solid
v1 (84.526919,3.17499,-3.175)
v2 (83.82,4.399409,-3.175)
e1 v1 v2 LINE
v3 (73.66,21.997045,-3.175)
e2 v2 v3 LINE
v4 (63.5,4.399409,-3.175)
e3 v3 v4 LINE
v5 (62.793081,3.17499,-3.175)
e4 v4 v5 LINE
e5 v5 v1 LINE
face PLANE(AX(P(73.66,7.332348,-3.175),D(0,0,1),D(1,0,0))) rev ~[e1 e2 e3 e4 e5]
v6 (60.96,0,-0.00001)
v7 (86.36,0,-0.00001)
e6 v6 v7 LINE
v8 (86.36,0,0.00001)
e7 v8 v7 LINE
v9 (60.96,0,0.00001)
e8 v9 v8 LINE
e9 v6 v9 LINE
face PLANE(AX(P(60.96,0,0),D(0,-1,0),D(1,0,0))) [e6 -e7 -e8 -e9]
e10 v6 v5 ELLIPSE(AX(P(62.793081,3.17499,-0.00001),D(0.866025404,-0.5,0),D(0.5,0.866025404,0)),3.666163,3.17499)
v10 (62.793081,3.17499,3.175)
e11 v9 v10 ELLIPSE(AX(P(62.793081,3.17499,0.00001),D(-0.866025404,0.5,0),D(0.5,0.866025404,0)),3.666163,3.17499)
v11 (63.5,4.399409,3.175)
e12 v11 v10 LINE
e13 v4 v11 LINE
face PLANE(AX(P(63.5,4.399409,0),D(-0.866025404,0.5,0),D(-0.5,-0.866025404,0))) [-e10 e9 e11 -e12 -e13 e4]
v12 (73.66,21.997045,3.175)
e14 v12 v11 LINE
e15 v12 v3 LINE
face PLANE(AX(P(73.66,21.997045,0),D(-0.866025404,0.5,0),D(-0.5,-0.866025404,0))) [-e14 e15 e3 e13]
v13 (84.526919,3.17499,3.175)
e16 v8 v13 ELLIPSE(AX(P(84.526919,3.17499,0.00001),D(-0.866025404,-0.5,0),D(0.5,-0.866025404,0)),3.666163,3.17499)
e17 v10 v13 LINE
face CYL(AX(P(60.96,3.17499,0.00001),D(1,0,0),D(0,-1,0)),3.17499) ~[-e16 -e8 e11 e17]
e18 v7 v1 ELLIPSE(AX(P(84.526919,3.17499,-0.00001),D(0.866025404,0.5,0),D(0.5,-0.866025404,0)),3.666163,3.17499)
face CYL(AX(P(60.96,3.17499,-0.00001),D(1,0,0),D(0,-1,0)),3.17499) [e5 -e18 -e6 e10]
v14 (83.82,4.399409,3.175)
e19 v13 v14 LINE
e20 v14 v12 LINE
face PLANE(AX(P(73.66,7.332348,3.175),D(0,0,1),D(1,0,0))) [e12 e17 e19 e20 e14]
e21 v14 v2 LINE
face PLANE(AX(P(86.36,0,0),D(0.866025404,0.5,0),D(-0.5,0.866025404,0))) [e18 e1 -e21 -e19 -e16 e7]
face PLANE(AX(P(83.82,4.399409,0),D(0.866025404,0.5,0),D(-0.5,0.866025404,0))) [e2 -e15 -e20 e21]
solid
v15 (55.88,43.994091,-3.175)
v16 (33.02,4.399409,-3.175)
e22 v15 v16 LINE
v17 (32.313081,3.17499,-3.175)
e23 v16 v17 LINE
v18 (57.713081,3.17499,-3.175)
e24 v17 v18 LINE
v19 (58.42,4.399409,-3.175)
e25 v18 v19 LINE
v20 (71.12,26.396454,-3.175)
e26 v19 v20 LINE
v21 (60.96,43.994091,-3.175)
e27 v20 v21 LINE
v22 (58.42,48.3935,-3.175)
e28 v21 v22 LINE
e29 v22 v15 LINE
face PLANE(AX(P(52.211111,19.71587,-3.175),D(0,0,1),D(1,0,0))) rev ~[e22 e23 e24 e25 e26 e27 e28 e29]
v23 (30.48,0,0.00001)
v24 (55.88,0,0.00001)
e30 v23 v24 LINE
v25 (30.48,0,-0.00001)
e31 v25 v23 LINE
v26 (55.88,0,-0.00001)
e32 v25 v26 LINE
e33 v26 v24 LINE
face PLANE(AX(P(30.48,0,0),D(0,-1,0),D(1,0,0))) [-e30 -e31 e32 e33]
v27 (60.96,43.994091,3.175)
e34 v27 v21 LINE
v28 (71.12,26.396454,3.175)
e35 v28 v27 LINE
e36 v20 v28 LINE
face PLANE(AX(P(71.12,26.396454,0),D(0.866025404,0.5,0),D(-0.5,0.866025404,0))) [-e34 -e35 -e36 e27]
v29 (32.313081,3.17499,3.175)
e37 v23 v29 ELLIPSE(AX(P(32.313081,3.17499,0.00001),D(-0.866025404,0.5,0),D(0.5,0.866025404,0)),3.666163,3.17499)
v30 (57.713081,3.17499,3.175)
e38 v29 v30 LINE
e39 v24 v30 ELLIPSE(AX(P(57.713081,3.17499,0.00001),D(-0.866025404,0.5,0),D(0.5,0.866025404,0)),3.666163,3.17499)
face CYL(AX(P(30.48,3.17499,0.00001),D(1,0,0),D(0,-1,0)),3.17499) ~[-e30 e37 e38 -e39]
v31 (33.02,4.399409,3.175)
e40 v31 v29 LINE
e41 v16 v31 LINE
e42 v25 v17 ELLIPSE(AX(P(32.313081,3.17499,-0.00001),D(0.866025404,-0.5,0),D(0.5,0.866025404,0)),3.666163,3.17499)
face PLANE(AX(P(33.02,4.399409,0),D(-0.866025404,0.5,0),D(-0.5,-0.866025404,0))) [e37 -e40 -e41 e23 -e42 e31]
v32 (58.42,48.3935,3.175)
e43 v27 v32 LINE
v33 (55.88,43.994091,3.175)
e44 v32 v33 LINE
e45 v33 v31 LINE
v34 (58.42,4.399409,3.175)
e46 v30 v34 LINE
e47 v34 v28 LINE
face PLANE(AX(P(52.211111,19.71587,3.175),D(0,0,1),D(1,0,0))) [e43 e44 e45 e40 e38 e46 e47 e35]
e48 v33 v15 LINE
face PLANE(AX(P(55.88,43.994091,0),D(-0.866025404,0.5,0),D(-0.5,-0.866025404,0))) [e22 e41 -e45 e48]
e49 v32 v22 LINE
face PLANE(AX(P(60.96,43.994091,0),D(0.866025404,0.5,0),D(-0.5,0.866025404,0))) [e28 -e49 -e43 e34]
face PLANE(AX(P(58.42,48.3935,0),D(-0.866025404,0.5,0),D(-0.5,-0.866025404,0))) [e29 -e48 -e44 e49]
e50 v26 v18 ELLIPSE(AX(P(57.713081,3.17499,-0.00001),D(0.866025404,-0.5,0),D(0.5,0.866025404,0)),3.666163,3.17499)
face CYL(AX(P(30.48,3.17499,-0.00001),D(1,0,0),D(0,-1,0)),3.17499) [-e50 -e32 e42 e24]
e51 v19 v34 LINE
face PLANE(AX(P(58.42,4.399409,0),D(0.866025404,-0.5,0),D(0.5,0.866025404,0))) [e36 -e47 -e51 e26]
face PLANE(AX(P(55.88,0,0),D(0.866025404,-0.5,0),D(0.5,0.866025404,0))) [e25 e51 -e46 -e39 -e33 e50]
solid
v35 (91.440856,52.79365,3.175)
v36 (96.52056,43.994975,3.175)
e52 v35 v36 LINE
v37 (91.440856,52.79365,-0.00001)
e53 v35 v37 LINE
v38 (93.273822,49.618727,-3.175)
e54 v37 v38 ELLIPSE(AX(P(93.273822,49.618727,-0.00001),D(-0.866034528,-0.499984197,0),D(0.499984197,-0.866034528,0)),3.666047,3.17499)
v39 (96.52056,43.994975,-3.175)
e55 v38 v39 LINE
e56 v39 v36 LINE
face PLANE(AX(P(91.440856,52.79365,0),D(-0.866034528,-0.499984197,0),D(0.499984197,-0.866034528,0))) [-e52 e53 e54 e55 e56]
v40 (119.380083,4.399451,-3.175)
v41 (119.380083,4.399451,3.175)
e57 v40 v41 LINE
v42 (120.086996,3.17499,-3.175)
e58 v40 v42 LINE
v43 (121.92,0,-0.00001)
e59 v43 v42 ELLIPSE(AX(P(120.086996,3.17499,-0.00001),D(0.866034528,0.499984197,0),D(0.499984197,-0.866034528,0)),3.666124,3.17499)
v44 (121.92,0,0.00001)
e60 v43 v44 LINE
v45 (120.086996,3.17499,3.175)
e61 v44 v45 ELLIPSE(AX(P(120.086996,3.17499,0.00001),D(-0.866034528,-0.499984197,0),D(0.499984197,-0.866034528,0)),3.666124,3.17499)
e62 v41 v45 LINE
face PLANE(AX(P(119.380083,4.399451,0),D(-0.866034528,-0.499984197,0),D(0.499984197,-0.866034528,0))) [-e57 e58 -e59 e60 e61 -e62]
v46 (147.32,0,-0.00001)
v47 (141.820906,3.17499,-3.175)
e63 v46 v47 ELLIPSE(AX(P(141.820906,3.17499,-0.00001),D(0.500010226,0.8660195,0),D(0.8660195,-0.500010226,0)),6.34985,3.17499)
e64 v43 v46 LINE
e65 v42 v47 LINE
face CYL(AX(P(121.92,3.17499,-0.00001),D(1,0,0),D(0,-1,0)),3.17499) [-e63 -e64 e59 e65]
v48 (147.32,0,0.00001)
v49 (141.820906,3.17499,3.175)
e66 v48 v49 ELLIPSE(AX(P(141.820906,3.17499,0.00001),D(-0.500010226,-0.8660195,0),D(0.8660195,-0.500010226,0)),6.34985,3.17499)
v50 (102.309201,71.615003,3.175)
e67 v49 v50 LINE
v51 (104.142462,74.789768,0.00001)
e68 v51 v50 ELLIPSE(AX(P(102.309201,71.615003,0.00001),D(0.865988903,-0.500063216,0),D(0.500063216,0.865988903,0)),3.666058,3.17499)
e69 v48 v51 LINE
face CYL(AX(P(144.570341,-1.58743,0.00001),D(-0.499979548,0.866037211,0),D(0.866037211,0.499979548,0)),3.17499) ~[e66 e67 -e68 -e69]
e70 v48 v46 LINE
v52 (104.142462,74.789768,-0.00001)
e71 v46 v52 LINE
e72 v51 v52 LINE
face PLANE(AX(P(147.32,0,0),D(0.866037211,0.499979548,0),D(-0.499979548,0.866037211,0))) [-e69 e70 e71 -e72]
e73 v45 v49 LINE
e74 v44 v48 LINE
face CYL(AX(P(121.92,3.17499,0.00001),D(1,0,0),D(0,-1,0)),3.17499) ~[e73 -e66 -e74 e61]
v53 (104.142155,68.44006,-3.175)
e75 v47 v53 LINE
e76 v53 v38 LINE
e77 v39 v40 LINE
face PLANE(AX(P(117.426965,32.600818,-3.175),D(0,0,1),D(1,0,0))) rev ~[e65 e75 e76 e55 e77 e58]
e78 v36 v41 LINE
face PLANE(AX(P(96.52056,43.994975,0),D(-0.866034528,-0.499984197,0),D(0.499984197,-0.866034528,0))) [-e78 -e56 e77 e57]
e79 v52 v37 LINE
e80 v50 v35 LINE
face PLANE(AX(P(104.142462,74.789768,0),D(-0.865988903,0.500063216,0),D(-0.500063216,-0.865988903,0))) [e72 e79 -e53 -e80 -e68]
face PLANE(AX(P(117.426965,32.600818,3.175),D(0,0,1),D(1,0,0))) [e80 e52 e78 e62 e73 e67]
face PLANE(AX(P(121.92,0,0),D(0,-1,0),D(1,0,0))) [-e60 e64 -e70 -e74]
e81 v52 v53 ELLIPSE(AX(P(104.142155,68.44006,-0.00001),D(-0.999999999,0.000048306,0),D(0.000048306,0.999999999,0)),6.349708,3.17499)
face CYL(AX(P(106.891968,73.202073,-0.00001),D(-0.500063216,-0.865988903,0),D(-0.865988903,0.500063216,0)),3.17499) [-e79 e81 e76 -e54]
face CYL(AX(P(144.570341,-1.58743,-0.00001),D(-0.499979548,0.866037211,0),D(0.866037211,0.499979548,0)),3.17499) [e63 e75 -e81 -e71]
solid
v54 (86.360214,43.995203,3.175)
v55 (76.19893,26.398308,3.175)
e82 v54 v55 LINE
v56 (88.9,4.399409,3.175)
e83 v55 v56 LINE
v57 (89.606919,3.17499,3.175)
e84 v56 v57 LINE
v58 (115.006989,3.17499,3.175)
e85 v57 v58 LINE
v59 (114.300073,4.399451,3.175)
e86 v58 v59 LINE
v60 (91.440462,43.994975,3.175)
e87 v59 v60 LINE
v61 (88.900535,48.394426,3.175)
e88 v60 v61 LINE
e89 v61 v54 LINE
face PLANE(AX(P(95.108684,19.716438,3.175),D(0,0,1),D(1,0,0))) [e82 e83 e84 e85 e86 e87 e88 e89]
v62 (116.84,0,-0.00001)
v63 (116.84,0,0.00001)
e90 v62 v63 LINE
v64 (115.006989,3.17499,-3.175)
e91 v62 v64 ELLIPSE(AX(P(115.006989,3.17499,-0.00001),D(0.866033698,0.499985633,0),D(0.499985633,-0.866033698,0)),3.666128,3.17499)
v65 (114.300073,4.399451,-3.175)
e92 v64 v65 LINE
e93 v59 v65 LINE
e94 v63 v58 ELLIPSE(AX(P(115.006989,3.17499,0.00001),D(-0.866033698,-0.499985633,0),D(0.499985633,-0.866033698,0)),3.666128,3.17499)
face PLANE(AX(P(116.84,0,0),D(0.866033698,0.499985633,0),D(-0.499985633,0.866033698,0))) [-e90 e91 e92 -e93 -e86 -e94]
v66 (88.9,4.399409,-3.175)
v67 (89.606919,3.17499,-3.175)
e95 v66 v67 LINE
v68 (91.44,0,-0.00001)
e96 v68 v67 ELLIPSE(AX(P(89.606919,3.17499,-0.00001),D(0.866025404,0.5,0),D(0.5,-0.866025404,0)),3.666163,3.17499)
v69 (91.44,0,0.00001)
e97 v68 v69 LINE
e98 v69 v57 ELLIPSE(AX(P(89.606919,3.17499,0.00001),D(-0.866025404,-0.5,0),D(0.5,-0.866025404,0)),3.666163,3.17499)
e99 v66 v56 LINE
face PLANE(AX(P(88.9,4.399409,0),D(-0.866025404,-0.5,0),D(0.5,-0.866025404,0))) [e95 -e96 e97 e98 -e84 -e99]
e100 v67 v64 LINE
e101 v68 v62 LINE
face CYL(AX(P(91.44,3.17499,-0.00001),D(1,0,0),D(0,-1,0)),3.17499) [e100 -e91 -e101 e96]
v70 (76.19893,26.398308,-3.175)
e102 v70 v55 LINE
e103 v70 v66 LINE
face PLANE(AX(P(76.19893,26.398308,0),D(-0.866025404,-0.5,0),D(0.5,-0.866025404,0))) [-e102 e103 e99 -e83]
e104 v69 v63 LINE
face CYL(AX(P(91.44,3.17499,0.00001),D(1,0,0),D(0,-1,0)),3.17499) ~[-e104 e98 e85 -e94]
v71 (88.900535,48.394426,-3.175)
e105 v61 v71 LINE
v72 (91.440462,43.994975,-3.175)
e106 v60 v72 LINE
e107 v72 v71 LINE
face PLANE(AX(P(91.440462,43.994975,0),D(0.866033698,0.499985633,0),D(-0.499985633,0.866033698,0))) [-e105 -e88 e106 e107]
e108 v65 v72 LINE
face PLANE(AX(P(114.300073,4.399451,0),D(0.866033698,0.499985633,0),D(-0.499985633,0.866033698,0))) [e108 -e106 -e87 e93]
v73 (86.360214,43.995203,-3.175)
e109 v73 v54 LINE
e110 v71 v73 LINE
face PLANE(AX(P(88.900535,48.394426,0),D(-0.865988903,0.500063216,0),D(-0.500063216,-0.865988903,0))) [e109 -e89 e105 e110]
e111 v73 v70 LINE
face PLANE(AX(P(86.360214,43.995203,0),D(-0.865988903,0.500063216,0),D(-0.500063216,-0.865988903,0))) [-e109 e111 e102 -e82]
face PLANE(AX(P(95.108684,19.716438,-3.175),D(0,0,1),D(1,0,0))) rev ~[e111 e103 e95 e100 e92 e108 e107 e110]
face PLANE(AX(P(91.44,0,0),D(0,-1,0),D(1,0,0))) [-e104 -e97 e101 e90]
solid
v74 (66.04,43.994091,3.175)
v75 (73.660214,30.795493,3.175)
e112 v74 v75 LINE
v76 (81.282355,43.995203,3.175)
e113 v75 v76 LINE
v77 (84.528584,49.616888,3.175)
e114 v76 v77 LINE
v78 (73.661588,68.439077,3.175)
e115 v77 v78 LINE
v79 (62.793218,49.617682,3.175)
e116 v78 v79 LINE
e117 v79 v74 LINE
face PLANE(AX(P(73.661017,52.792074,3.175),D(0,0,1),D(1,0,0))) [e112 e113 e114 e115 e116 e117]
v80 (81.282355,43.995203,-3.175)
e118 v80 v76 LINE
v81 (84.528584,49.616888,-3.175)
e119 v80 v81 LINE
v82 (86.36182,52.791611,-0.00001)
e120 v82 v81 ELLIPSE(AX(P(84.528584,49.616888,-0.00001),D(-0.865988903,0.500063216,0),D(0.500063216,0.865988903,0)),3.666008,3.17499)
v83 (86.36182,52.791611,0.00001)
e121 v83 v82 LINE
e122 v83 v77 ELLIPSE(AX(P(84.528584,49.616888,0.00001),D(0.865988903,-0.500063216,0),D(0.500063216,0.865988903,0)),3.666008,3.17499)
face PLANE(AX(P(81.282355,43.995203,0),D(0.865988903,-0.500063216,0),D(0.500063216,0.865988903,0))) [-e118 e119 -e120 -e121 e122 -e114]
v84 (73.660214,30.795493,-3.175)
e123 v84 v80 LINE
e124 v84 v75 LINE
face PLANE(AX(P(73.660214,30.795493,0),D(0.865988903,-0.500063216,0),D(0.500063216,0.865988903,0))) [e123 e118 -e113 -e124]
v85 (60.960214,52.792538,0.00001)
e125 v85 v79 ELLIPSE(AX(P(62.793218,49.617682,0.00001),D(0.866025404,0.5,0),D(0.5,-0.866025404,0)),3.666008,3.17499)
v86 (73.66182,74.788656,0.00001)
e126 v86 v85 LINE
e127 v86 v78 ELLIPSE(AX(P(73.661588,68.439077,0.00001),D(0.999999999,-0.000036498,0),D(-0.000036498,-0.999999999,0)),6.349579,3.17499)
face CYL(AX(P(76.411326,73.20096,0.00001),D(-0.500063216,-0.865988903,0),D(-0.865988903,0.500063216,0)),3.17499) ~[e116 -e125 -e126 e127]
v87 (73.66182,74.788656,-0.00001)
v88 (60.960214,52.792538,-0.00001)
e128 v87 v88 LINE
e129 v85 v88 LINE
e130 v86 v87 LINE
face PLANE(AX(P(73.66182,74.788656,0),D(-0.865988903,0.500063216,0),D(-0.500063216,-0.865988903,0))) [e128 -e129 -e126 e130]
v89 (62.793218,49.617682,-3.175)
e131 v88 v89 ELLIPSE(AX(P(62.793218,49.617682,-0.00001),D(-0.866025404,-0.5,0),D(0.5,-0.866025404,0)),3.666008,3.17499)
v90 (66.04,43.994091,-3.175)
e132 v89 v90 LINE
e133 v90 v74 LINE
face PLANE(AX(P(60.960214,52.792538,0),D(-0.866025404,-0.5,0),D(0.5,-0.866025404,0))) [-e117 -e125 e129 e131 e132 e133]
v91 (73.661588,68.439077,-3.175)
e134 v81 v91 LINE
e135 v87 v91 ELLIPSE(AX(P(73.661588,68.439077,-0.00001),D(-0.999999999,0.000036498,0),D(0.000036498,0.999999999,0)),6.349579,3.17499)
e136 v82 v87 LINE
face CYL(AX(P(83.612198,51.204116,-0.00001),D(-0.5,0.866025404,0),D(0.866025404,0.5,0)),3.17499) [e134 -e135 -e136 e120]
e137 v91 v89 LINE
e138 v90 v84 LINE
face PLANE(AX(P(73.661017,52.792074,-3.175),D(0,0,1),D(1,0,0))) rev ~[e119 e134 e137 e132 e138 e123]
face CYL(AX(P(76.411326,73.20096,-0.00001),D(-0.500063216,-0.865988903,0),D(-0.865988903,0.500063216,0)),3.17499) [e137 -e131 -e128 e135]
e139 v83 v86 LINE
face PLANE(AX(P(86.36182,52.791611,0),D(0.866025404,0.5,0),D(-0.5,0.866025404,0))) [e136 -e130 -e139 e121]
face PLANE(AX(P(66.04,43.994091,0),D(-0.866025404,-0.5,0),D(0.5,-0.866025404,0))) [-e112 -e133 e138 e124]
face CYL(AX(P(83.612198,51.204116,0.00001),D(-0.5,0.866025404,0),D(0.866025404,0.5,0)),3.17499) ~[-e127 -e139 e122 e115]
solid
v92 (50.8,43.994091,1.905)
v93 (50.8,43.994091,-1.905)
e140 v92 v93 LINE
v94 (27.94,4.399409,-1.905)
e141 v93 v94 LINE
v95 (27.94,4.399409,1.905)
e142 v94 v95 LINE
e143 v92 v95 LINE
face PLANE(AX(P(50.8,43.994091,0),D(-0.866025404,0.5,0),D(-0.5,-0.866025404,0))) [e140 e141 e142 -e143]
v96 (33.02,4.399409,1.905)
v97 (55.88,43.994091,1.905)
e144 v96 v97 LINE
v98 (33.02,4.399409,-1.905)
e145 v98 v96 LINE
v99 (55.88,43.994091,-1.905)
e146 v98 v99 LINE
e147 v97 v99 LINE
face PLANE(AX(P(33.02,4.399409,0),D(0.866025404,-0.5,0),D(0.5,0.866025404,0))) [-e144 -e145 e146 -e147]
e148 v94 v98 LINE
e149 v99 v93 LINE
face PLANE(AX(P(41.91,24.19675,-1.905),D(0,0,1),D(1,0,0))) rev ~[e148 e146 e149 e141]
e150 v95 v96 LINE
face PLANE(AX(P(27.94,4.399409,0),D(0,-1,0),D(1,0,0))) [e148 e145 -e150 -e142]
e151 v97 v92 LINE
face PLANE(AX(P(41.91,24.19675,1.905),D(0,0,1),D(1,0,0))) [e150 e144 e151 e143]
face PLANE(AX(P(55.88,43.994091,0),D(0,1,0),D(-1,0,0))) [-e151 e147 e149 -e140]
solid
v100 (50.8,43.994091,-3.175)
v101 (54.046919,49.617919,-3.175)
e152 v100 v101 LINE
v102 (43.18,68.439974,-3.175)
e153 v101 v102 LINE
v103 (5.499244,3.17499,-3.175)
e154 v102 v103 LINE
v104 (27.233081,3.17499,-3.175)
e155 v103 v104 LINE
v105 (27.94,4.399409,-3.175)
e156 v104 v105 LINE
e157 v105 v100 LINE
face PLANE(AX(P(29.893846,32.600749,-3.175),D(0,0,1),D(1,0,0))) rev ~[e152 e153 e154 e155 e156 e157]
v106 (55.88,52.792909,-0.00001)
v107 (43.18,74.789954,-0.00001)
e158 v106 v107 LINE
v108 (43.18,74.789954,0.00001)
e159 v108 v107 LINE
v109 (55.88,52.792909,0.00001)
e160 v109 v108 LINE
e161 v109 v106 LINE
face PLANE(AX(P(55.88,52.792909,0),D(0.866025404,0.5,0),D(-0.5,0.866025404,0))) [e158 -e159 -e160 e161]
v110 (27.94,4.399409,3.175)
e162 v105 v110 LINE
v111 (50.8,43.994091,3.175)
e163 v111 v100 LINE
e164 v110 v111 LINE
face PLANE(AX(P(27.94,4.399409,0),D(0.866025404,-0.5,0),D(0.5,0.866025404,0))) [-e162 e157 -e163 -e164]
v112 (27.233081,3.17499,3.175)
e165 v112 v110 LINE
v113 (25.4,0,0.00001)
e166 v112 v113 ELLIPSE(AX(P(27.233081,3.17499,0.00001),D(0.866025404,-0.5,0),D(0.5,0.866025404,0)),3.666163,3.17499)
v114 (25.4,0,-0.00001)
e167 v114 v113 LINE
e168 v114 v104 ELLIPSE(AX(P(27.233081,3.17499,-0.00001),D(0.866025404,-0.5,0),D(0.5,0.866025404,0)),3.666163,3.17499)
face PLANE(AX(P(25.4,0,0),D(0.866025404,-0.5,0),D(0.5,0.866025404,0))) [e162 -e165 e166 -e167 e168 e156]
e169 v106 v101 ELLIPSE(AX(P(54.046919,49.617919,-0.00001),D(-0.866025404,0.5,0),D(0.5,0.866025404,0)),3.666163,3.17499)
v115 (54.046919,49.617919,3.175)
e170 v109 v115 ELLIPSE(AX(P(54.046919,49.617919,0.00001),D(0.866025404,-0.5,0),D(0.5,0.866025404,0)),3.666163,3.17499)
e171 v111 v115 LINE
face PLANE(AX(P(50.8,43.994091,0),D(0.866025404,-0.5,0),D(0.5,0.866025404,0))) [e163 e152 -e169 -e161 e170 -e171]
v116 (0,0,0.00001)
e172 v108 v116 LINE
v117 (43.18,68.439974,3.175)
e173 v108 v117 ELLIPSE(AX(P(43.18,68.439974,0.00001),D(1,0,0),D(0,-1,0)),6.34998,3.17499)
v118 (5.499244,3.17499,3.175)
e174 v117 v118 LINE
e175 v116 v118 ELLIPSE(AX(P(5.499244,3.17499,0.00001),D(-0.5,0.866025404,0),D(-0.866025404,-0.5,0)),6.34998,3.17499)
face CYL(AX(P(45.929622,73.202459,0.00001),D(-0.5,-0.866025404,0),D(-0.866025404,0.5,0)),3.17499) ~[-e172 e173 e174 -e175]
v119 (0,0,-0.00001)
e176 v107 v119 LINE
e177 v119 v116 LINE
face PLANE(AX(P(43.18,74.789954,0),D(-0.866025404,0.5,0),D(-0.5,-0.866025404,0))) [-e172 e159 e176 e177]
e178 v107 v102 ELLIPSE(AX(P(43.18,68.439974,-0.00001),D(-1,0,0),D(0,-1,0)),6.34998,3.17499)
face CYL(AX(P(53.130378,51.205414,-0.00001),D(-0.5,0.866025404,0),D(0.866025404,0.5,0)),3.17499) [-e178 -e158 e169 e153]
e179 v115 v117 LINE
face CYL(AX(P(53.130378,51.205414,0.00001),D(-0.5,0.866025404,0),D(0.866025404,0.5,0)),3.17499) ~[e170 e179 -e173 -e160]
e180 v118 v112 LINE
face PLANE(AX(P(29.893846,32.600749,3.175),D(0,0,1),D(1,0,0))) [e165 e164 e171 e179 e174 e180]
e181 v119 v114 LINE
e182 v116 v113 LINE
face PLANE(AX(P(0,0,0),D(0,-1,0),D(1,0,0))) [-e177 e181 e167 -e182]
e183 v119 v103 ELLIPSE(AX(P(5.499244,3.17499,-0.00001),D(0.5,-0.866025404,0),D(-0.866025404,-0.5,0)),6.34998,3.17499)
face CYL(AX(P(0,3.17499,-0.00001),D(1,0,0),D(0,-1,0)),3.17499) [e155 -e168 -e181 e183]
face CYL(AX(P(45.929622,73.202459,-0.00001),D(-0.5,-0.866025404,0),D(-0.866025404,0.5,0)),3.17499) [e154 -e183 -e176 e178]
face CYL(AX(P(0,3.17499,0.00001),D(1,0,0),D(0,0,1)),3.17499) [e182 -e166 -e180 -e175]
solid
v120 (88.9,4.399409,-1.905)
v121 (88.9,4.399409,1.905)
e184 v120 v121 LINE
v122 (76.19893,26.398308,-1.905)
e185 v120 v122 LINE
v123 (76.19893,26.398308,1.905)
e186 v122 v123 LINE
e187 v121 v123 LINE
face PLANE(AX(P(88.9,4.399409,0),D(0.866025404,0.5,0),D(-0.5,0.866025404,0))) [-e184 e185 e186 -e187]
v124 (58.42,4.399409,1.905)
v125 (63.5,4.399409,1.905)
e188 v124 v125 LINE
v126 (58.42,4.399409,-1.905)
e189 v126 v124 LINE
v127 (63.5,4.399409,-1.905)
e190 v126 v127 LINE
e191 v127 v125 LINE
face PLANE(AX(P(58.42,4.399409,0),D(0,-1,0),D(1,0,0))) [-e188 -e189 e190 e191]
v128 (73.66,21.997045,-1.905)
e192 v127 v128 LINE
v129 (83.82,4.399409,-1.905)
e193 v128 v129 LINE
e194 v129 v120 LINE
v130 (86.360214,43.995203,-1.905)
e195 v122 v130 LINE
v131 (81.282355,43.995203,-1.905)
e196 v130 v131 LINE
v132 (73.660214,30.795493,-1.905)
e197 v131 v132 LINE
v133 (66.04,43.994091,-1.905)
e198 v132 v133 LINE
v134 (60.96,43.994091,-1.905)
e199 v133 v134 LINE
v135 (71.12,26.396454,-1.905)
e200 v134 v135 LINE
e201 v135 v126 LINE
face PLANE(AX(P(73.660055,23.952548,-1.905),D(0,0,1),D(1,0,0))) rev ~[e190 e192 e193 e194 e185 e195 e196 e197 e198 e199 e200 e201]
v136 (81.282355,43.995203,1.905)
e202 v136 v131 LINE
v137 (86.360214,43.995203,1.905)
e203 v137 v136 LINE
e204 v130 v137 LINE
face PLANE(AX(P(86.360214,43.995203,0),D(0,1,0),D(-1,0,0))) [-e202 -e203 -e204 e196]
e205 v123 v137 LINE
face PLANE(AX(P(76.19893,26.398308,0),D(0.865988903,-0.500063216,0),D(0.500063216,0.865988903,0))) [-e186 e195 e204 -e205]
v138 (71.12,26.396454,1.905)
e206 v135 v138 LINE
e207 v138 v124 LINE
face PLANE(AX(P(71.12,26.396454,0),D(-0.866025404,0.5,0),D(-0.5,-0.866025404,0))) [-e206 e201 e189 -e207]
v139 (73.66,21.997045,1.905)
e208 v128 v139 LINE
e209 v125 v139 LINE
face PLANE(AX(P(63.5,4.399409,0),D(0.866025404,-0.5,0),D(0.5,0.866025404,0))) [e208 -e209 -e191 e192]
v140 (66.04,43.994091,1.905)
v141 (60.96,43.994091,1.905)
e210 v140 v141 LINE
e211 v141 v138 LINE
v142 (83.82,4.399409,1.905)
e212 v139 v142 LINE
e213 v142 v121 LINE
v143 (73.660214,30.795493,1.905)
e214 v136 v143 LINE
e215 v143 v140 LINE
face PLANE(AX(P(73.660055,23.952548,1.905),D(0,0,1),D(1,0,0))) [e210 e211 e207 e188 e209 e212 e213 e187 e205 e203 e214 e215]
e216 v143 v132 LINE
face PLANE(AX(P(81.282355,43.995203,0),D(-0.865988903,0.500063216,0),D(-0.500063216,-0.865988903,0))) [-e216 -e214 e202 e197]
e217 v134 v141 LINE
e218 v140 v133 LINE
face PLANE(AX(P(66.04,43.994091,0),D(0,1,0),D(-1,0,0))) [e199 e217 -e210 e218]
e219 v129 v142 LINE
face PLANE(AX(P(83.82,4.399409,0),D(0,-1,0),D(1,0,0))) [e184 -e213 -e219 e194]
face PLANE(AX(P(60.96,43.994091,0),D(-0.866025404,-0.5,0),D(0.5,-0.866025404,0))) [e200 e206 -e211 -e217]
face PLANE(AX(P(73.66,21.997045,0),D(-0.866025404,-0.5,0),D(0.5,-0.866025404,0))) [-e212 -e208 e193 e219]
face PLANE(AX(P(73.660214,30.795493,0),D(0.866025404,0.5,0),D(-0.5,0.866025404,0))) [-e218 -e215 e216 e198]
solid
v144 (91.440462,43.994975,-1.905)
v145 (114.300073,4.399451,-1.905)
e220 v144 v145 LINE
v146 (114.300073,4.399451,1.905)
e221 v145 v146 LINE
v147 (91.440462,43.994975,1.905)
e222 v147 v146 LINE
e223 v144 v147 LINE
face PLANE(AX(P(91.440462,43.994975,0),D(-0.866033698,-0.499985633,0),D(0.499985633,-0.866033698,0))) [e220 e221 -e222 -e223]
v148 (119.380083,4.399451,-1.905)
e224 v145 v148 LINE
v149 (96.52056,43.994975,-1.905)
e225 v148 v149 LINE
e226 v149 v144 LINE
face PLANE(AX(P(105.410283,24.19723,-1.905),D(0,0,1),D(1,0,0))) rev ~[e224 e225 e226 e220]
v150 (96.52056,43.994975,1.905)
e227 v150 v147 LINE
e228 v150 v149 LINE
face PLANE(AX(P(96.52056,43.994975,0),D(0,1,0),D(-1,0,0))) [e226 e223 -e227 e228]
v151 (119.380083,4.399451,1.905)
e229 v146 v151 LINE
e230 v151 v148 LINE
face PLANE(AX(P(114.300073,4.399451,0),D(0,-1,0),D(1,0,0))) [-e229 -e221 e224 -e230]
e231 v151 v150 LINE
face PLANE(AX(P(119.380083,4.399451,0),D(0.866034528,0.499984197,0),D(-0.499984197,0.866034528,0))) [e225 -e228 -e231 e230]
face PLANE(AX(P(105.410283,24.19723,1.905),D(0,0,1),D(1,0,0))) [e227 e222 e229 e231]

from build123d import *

# Parameters (mm, degrees)
F1_DEPTH = 3.175
F2_DEPTH = 1.905
F3_R     = 3.17499
F3_2_R   = 3.17499
F3_3_R   = 3.17499
F3_4_R   = 3.17499
F3_5_R   = 3.17499
F3_6_R   = 3.17499


# Not quite as in the source:
# - a fillet or chamfer is up to 0.001 mm smaller than in the source, because OpenCascade refuses the exact size


with BuildPart() as f1:
    # F0 (on Top) → F1 (new body, symmetric)
    with BuildSketch(Plane.XY):
        Polygon((43.18, 74.7899538708), (0, 0), (25.4, 0), (27.94, 4.3994090512), (50.8, 43.9940905122), (55.88, 52.7929086147), align=None)
    extrude(amount=F1_DEPTH, both=True)

    # F3 (radius 3.175 in the source; OpenCascade refuses exactly that, so slightly less here)
    f3_edges = [f1.edges().sort_by_distance(p)[0] for p in [
        (21.59, 37.394977, 3.175),
        (21.59, 37.394977, -3.175),
        (12.7, 0, -3.175),
        (12.7, 0, 3.175),
        (49.53, 63.791431, 3.175),
        (49.53, 63.791431, -3.175),
    ]]
    fillet(f3_edges, radius=F3_R)


with BuildPart() as f1b:
    # F0 (on Top) → F1, piece 2 (new body, symmetric)
    with BuildSketch(Plane.XY):
        Polygon((55.88, 43.9940905122), (33.02, 4.3994090512), (30.48, 0), (55.88, 0), (58.42, 4.3994090512), (71.12, 26.3964543073), (60.96, 43.9940905122), (58.42, 48.3934995635), align=None)
    extrude(amount=F1_DEPTH, both=True)

    # F3#3 (radius 3.175 in the source; OpenCascade refuses exactly that, so slightly less here)
    f3_3_edges = [f1b.edges().sort_by_distance(p)[0] for p in [
        (43.18, 0, -3.175),
        (43.18, 0, 3.175),
    ]]
    fillet(f3_3_edges, radius=F3_3_R)


with BuildPart() as f1c:
    # F0 (on Top) → F1, piece 3 (new body, symmetric)
    with BuildSketch(Plane.XY):
        Polygon((60.9602140859, 52.792537807), (66.04, 43.9940905122), (73.6602140859, 30.7954925508), (81.2823551529, 43.9952028573), (86.3618197643, 52.79161069), (73.6618197643, 74.7886559461), align=None)
    extrude(amount=F1_DEPTH, both=True)

    # F3#2 (radius 3.175 in the source; OpenCascade refuses exactly that, so slightly less here)
    f3_2_edges = [f1c.edges().sort_by_distance(p)[0] for p in [
        (67.311017, 63.790597, 3.175),
        (80.01182, 63.790133, 3.175),
        (80.01182, 63.790133, -3.175),
        (67.311017, 63.790597, -3.175),
    ]]
    fillet(f3_2_edges, radius=F3_2_R)


with BuildPart() as f1d:
    # F0 (on Top) → F1, piece 4 (new body, symmetric)
    with BuildSketch(Plane.XY):
        Polygon((88.9005352487, 48.3944264851), (86.360214113, 43.9952028573), (76.1989295703, 26.398308346), (88.9, 4.3994090512), (91.44, 0), (116.84, 0), (114.300072982, 4.3994511866), (91.4404622667, 43.9949752986), align=None)
    extrude(amount=F1_DEPTH, both=True)

    # F3#5 (radius 3.175 in the source; OpenCascade refuses exactly that, so slightly less here)
    f3_5_edges = [f1d.edges().sort_by_distance(p)[0] for p in [
        (104.14, 0, -3.175),
        (104.14, 0, 3.175),
    ]]
    fillet(f3_5_edges, radius=F3_5_R)


with BuildPart() as f1e:
    # F0 (on Top) → F1, piece 5 (new body, symmetric)
    with BuildSketch(Plane.XY):
        Polygon((73.66, 21.9970452561), (63.5, 4.3994090512), (60.96, 0), (86.36, 0), (83.82, 4.3994090512), align=None)
    extrude(amount=F1_DEPTH, both=True)

    # F3#4 (radius 3.175 in the source; OpenCascade refuses exactly that, so slightly less here)
    f3_4_edges = [f1e.edges().sort_by_distance(p)[0] for p in [
        (73.66, 0, -3.175),
        (73.66, 0, 3.175),
    ]]
    fillet(f3_4_edges, radius=F3_4_R)


with BuildPart() as f1f:
    # F0 (on Top) → F1, piece 6 (new body, symmetric)
    with BuildSketch(Plane.XY):
        Polygon((91.4408563844, 52.793650113), (96.520559582, 43.9949752986), (119.3800827134, 4.3994511866), (121.92, 0), (147.32, 0), (104.1424620628, 74.7897682521), align=None)
    extrude(amount=F1_DEPTH, both=True)

    # F3#6 (radius 3.175 in the source; OpenCascade refuses exactly that, so slightly less here)
    f3_6_edges = [f1f.edges().sort_by_distance(p)[0] for p in [
        (134.62, 0, -3.175),
        (125.731231, 37.394884, -3.175),
        (97.791659, 63.791709, -3.175),
        (134.62, 0, 3.175),
        (125.731231, 37.394884, 3.175),
    ]]
    fillet(f3_6_edges, radius=F3_6_R)


with BuildPart() as f2:
    # F0 (on Top) → F2 (new body, symmetric)
    with BuildSketch(Plane.XY):
        Polygon((96.520559582, 43.9949752986), (91.4404622667, 43.9949752986), (114.300072982, 4.3994511866), (119.3800827134, 4.3994511866), align=None)
    extrude(amount=F2_DEPTH, both=True)


with BuildPart() as f2b:
    # F0 (on Top) → F2, piece 2 (new body, symmetric)
    with BuildSketch(Plane.XY):
        Polygon((66.04, 43.9940905122), (60.96, 43.9940905122), (71.12, 26.3964543073), (58.42, 4.3994090512), (63.5, 4.3994090512), (73.66, 21.9970452561), (83.82, 4.3994090512), (88.9, 4.3994090512), (76.1989295703, 26.398308346), (86.360214113, 43.9952028573), (81.2823551529, 43.9952028573), (73.6602140859, 30.7954925508), align=None)
    extrude(amount=F2_DEPTH, both=True)


with BuildPart() as f2c:
    # F0 (on Top) → F2, piece 3 (new body, symmetric)
    with BuildSketch(Plane.XY):
        Polygon((50.8, 43.9940905122), (27.94, 4.3994090512), (33.02, 4.3994090512), (55.88, 43.9940905122), align=None)
    extrude(amount=F2_DEPTH, both=True)


solid = Compound([f1.part, f1b.part, f1c.part, f1d.part, f1e.part, f1f.part, f2.part, f2b.part, f2c.part])
